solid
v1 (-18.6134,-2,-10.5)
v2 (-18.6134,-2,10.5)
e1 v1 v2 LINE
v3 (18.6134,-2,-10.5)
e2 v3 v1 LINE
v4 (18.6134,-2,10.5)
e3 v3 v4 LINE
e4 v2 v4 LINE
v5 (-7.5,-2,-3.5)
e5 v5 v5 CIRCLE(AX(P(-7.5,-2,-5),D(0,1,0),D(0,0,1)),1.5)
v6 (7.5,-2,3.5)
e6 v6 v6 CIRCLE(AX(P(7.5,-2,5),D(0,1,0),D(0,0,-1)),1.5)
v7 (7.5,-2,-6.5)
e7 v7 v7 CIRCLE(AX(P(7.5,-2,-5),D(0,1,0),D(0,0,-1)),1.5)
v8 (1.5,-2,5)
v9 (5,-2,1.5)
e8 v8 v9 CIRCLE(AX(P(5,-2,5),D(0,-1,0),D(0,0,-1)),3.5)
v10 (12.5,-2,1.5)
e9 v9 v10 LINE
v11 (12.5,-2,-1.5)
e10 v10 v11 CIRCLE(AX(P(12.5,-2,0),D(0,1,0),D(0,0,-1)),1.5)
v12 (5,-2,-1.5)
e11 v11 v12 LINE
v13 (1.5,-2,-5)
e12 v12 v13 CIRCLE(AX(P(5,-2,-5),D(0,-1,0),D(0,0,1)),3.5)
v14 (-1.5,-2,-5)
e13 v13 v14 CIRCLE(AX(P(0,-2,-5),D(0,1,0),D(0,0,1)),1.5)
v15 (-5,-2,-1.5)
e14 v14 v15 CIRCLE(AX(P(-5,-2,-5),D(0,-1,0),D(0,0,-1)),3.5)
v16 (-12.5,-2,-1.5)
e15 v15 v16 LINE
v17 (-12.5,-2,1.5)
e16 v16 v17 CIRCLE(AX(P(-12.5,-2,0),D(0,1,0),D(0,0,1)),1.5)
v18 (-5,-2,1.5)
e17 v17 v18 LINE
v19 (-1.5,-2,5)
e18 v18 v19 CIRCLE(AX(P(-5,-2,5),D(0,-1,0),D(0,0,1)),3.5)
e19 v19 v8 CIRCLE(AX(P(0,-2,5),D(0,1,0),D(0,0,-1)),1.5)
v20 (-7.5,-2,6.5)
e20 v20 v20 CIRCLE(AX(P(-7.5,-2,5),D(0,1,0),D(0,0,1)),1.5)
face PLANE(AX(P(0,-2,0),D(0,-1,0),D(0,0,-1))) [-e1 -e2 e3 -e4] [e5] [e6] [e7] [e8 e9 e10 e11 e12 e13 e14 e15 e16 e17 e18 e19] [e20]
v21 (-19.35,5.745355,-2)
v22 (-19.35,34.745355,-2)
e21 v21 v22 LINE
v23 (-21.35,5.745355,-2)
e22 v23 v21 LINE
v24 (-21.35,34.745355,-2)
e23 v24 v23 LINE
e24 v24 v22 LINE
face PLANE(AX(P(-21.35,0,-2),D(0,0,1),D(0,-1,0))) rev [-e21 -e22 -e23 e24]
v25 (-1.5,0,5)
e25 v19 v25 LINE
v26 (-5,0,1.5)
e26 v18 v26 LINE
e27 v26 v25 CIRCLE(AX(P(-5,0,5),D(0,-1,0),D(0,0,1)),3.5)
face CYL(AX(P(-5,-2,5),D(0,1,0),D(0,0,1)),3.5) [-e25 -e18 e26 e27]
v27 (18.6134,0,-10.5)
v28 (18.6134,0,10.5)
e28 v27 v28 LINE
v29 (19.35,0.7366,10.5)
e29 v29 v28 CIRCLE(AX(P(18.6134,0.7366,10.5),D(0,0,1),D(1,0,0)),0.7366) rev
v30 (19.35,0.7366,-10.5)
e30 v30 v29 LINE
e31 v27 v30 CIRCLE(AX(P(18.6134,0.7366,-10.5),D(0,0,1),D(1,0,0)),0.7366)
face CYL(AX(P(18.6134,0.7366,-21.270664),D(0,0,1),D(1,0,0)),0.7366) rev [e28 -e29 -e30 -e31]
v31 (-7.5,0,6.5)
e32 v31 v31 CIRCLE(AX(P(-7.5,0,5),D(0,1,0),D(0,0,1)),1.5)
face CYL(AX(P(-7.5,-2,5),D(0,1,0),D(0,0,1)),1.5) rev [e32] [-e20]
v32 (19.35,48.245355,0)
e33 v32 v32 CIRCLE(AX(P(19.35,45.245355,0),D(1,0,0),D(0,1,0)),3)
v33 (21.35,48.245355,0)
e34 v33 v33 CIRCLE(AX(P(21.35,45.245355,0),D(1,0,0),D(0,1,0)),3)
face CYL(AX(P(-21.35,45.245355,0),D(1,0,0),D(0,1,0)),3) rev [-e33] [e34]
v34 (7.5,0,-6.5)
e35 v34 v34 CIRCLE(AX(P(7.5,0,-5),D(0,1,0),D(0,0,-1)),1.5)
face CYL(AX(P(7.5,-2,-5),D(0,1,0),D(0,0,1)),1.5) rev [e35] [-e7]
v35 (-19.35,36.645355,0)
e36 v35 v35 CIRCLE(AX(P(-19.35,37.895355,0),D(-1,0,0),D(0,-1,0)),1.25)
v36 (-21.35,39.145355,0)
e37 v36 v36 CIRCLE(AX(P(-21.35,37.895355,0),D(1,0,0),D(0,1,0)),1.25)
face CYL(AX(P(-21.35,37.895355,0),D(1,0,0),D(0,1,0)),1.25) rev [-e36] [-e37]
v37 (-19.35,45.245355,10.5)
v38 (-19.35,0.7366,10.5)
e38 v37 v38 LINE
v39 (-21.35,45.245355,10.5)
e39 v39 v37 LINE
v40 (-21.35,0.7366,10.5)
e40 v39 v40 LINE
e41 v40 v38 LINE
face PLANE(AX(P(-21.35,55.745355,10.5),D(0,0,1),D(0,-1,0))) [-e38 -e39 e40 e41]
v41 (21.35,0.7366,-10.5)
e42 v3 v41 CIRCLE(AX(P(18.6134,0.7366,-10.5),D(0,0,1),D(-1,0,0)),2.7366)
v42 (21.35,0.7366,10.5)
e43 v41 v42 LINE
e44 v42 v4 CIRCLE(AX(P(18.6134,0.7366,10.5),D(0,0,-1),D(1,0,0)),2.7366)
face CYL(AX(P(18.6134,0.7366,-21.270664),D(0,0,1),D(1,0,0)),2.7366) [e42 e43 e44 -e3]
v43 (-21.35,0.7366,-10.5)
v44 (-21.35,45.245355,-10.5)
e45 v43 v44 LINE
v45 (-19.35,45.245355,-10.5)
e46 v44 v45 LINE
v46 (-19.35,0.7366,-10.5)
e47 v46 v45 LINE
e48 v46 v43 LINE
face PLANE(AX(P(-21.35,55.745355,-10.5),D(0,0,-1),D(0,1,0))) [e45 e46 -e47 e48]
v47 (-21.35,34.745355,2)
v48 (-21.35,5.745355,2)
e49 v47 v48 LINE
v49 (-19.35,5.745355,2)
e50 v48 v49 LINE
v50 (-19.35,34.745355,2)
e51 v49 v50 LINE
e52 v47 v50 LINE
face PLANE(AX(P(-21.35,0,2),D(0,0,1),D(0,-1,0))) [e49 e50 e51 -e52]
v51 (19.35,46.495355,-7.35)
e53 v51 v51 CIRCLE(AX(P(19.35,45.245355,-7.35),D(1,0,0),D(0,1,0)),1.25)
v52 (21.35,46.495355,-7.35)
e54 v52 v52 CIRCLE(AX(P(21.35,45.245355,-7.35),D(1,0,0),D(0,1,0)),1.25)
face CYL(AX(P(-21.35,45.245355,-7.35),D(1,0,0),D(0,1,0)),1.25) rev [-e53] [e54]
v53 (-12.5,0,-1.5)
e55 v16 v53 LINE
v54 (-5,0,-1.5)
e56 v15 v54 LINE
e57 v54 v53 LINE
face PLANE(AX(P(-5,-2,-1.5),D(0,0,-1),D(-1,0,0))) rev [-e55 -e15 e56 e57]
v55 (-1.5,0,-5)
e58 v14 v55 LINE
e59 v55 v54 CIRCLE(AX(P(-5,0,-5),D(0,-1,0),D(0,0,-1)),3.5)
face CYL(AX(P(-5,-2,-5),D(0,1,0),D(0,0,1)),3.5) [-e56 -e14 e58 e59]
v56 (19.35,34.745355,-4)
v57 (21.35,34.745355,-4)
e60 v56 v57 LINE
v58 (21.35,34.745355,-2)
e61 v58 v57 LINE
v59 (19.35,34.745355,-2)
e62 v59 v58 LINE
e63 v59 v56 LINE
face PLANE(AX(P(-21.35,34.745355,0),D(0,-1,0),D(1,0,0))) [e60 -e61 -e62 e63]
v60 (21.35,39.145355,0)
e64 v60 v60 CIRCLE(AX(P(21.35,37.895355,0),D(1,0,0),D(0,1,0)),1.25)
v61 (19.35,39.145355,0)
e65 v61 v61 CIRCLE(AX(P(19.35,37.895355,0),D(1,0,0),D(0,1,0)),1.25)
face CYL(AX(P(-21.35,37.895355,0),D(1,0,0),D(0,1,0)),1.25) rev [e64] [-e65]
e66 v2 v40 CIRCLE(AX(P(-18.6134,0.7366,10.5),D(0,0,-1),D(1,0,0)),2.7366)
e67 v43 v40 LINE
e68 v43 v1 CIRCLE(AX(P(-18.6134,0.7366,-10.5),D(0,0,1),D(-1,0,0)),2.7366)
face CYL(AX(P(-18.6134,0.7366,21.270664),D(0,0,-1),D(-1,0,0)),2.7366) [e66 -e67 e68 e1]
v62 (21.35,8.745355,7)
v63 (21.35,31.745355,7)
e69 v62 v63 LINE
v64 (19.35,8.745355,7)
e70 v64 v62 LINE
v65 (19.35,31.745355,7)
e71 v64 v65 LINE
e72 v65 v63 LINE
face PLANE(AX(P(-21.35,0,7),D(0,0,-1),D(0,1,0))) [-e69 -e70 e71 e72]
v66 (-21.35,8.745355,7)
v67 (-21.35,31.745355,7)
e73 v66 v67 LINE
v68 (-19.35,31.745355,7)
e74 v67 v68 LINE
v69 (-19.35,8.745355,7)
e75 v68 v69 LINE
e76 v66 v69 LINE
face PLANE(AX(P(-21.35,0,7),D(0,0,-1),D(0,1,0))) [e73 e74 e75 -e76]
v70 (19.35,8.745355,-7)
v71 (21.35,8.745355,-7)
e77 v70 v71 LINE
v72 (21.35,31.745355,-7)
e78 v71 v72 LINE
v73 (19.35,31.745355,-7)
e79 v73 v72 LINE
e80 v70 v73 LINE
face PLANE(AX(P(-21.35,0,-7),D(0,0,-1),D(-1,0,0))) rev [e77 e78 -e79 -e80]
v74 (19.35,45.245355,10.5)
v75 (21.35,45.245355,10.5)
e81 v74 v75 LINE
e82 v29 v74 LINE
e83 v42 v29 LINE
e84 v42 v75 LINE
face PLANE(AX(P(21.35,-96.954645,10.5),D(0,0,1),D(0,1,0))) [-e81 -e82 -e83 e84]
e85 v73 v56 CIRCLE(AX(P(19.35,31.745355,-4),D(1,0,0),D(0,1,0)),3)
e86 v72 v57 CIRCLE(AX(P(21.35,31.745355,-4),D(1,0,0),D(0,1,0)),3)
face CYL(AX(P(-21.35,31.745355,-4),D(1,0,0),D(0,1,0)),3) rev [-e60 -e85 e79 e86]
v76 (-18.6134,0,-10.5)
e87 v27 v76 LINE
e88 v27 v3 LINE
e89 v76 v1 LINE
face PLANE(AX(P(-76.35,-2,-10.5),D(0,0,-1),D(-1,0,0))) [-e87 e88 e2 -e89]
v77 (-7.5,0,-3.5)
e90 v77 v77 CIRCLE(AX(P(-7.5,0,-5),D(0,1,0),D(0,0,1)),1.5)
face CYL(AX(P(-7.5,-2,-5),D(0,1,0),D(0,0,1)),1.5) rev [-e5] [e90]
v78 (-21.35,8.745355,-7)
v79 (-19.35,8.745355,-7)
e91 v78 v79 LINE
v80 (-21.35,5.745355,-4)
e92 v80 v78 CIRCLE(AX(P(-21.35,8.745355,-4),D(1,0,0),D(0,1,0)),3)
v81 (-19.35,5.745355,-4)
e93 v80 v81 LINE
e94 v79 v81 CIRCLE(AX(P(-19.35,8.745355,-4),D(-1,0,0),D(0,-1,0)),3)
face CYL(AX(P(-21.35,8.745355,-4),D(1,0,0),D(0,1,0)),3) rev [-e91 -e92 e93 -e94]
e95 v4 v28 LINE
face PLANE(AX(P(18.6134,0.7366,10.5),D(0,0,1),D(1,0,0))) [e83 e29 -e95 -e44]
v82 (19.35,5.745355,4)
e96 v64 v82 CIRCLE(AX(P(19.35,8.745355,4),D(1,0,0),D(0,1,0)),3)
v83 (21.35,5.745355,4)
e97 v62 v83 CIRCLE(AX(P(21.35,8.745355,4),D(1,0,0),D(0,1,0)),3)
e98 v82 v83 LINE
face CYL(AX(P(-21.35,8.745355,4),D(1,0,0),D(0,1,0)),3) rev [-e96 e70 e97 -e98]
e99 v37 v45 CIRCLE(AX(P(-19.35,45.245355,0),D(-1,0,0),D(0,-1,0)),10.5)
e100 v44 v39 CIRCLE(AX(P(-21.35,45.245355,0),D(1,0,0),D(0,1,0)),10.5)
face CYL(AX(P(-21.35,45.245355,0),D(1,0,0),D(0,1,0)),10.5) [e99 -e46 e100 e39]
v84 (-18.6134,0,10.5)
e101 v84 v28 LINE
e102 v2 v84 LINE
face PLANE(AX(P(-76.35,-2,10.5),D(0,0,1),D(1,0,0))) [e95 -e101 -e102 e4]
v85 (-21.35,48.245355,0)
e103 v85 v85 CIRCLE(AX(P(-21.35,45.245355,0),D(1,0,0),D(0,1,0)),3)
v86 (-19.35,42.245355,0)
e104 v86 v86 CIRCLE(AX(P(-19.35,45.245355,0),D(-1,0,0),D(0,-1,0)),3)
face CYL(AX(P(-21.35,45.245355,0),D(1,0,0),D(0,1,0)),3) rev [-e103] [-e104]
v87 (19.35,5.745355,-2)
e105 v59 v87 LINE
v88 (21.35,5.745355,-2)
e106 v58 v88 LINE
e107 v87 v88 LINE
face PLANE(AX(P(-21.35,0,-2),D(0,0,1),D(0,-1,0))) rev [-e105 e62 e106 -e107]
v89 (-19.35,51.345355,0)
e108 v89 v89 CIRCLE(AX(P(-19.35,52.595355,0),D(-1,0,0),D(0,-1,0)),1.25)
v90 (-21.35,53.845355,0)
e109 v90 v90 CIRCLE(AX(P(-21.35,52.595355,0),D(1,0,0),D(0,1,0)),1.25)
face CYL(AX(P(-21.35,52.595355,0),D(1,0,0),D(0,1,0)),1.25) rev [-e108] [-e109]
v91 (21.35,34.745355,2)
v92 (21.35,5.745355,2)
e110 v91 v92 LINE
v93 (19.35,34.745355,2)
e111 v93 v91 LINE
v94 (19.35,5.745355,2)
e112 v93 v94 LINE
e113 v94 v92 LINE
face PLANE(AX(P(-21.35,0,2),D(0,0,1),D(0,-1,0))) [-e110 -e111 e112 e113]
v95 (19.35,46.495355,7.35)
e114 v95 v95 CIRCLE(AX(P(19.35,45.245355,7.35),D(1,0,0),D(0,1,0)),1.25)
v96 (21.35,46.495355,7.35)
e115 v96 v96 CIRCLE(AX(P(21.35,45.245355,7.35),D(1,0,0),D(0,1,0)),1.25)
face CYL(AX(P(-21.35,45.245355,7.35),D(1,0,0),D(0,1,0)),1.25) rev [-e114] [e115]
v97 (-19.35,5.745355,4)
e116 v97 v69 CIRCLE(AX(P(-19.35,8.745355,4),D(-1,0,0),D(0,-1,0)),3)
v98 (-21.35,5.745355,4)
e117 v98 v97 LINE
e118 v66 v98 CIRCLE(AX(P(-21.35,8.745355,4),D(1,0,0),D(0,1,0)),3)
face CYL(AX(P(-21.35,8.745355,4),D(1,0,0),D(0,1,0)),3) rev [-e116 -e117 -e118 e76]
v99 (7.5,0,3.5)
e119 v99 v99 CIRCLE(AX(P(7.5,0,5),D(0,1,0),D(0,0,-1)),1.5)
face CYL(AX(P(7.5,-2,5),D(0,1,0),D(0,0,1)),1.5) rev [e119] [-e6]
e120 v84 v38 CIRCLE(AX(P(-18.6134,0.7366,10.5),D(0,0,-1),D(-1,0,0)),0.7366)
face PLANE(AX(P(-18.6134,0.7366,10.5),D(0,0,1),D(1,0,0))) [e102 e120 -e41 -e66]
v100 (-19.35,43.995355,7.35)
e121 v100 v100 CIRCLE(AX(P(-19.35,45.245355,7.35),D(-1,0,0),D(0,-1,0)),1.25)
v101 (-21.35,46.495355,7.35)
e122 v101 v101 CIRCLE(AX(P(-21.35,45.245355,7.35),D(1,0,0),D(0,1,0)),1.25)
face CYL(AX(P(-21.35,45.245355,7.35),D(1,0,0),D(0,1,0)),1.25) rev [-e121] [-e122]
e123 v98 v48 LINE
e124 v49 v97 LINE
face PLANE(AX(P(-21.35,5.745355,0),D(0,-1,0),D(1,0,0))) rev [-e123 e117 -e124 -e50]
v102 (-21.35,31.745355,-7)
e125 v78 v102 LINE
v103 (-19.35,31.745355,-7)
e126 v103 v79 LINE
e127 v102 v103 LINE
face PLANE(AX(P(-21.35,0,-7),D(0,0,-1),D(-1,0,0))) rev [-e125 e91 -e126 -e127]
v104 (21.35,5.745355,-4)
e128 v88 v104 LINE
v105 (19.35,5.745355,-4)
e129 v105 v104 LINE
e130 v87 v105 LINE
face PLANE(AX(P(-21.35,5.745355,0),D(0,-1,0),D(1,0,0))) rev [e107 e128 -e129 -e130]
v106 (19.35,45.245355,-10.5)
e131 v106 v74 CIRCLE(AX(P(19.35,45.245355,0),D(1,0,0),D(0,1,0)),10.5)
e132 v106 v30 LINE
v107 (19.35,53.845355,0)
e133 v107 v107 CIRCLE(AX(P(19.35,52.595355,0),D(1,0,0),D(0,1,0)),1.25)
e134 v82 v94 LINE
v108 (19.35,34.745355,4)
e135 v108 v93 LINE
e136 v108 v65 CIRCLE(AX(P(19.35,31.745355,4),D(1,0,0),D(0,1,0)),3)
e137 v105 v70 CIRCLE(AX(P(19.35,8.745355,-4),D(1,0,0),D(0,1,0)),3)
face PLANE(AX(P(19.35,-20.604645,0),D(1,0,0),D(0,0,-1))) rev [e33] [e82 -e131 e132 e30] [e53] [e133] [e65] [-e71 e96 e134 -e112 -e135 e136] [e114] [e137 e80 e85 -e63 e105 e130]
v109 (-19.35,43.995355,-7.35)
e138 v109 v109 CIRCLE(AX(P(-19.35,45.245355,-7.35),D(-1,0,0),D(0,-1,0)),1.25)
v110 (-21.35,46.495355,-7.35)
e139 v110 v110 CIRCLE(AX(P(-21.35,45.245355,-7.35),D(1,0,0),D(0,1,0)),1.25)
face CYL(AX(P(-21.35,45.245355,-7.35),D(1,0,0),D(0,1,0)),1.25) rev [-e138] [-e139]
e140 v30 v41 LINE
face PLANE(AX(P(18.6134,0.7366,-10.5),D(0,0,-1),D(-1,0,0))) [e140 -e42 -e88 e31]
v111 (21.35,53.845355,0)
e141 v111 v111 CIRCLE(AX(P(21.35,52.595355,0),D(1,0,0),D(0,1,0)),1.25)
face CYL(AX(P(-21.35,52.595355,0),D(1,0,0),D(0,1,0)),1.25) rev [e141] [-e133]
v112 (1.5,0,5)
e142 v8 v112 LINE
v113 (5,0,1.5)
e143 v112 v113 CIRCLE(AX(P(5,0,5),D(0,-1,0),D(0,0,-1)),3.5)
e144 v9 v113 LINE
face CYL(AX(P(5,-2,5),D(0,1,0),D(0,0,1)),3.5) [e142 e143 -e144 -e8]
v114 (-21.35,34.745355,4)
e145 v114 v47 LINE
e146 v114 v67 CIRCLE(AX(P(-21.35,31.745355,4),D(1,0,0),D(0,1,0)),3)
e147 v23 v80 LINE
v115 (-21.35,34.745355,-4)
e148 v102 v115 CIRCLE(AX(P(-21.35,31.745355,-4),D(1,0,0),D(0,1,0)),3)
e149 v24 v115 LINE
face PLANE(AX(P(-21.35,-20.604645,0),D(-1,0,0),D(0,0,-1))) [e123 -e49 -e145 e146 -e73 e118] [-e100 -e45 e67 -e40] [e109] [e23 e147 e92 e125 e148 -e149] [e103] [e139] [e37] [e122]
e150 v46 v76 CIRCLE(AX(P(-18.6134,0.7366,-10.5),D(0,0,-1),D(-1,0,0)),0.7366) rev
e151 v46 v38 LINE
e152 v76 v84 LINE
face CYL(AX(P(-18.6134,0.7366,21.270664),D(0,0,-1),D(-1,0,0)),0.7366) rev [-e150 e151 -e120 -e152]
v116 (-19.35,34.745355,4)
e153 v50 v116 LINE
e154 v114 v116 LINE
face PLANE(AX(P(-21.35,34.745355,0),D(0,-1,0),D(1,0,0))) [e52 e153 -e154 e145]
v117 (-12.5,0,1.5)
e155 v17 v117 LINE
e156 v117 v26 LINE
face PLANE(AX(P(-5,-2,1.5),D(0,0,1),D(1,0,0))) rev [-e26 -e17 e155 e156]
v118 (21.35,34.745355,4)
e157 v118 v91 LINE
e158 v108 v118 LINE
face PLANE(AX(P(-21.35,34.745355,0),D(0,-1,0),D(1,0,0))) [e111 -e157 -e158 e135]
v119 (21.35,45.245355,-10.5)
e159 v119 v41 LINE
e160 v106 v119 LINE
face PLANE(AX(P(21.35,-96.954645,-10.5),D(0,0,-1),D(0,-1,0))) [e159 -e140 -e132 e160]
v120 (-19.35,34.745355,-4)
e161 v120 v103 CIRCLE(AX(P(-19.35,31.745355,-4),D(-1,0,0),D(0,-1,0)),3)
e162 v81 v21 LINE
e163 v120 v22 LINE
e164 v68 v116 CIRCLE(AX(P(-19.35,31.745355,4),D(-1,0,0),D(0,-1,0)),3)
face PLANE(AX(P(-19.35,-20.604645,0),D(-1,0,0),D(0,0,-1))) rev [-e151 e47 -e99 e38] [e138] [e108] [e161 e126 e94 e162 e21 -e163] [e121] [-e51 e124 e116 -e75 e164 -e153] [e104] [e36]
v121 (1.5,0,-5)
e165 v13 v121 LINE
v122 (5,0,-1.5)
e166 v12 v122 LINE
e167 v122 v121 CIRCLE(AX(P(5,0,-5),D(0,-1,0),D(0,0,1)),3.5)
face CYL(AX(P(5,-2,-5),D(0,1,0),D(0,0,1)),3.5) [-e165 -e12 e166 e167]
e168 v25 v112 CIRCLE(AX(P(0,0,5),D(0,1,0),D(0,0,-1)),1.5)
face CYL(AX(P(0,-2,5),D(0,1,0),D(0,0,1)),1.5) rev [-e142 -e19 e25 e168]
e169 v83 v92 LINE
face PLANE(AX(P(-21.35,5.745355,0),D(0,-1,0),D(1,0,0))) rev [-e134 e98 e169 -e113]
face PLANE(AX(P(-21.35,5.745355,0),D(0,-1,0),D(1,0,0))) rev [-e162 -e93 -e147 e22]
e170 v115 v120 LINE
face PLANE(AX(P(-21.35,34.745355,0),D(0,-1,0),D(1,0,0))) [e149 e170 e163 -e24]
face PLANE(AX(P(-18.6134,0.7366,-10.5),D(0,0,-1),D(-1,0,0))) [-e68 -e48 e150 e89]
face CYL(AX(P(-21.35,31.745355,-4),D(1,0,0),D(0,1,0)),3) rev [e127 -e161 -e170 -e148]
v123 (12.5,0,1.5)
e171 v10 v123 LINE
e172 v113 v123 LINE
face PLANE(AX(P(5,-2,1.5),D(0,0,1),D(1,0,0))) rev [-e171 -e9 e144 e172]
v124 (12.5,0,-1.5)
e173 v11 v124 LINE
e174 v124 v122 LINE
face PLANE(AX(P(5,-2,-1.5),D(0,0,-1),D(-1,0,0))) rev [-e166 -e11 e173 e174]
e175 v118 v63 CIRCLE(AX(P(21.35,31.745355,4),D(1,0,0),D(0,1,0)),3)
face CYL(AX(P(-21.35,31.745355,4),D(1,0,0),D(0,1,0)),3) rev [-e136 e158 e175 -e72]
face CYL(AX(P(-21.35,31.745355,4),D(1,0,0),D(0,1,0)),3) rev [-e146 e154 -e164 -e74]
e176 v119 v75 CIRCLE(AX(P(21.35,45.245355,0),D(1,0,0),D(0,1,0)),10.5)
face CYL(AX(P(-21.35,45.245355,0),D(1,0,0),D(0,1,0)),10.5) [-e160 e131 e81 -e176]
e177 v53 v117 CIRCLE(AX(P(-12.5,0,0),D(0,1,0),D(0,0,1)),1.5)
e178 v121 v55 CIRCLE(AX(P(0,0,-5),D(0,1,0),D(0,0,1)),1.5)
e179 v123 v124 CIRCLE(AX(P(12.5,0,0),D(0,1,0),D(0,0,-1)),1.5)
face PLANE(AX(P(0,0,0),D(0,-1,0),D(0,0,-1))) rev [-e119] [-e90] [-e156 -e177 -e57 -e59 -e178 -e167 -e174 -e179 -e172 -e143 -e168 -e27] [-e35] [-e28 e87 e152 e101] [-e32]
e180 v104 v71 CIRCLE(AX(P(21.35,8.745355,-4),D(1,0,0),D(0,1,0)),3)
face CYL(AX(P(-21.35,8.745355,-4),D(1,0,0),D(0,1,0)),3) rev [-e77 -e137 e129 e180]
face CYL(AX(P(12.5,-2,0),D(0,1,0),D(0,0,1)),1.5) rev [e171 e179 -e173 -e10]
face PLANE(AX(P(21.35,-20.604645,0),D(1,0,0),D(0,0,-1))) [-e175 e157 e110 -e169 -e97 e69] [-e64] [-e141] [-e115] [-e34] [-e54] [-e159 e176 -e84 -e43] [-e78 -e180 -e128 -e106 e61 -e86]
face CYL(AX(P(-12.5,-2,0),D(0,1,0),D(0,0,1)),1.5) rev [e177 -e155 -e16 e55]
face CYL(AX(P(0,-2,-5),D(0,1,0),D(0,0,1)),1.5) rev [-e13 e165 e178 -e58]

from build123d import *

# Parameters (mm, degrees)
CROQUIS2_W                  = 152.7
CROQUIS2_H                  = 21
BRIDA_BASE1_DEPTH           = 2
PLIEGUE_START               = -10.5
PLIEGUE_CROQUIZADO1_DEPTH   = 21
PLIEGUE_CROQUIZADO1_2_DEPTH = 21
CROQUIS8_R                  = 1.25
CROQUIS8_R_2                = 3
CORTAR_EXTRUIR1_DEPTH       = 72.000595879
CROQUIS9_R                  = 1.5
CORTAR_EXTRUIR2_DEPTH       = 2


# Read off the part's stored shape, not the designer's step: Pliegue croquizado1
# Sheet-metal steps are written as plain solids
with BuildPart() as part:
    # Croquis2 → Brida base1 (new body)
    with BuildSketch(Plane(origin=(0, 0, 0), x_dir=(1, 0, 0), z_dir=(0, 1, 0))):
        Rectangle(CROQUIS2_W, CROQUIS2_H)
    extrude(amount=-BRIDA_BASE1_DEPTH)

    # Pliegue croquizado1 outline → Pliegue croquizado1 (cut)
    with BuildSketch(Plane.XY.offset(PLIEGUE_START)):
        with BuildLine():
            Line((-76.35, -2), (-18.6134, -2))
            ThreePointArc((-18.6134, -2), (-20.267667209, -1.443395312), (-21.249002398, 0))
            Line((-21.249002398, 0), (-76.35, 0))
            Line((-76.35, 0), (-76.35, -2))
        make_face()
        with BuildLine():
            ThreePointArc((21.249002398, 0), (20.267667209, -1.443395312), (18.6134, -2))
            Line((18.6134, -2), (76.35, -2))
            Line((76.35, -2), (76.35, 0))
            Line((76.35, 0), (21.249002398, 0))
        make_face()
    extrude(amount=PLIEGUE_CROQUIZADO1_DEPTH, mode=Mode.SUBTRACT)

    # Pliegue croquizado1 2 outline → Pliegue croquizado1 2 (add)
    with BuildSketch(Plane.XY.offset(PLIEGUE_START)):
        with BuildLine():
            ThreePointArc((-21.35, 0.7366), (-21.324633029, 0.364854094), (-21.249002398, 0))
            Line((-21.249002398, 0), (-18.6134, 0))
            ThreePointArc((-18.6134, 0), (-19.134254855, 0.215745145), (-19.35, 0.7366))
            Line((-19.35, 0.7366), (-19.35, 55.745355099))
            Line((-19.35, 55.745355099), (-21.35, 55.745355099))
            Line((-21.35, 55.745355099), (-21.35, 0.7366))
        make_face()
        with BuildLine():
            Line((18.6134, 0), (21.249002398, 0))
            ThreePointArc((21.249002398, 0), (21.324633029, 0.364854094), (21.35, 0.7366))
            Line((21.35, 0.7366), (21.35, 55.745355099))
            Line((21.35, 55.745355099), (19.35, 55.745355099))
            Line((19.35, 55.745355099), (19.35, 0.7366))
            ThreePointArc((19.35, 0.7366), (19.134254855, 0.215745145), (18.6134, 0))
        make_face()
    extrude(amount=PLIEGUE_CROQUIZADO1_2_DEPTH)

    # Croquis8 → Cortar-Extruir1 (cut, through all)
    with BuildSketch(Plane(origin=(21.35, 0, 0), x_dir=(0, 0, -1), z_dir=(1, 0, 0))):
        with BuildLine():
            Line((-7, 8.745355099), (-7, 31.745355099))
            ThreePointArc((-7, 31.745355099), (-6.121320344, 33.866675442), (-4, 34.745355099))
            Line((-4, 34.745355099), (-2, 34.745355099))
            Line((-2, 34.745355099), (-2, 5.745355099))
            Line((-2, 5.745355099), (-4, 5.745355099))
            ThreePointArc((-4, 5.745355099), (-6.121320344, 6.624034755), (-7, 8.745355099))
        make_face()
        with BuildLine():
            Line((2, 5.745355099), (4, 5.745355099))
            ThreePointArc((4, 5.745355099), (6.121320344, 6.624034755), (7, 8.745355099))
            Line((7, 8.745355099), (7, 31.745355099))
            ThreePointArc((7, 31.745355099), (6.121320344, 33.866675442), (4, 34.745355099))
            Line((4, 34.745355099), (2, 34.745355099))
            Line((2, 34.745355099), (2, 5.745355099))
        make_face()
        with BuildLine():
            ThreePointArc((0, 55.745355099), (7.424621202, 52.669976301), (10.5, 45.245355099))
            Line((10.5, 45.245355099), (10.5, 55.745355099))
            Line((10.5, 55.745355099), (0, 55.745355099))
        make_face()
        with BuildLine():
            ThreePointArc((-10.5, 45.245355099), (-7.424621202, 52.669976301), (0, 55.745355099))
            Line((0, 55.745355099), (-10.5, 55.745355099))
            Line((-10.5, 55.745355099), (-10.5, 45.245355099))
        make_face()
        with Locations(Location((-7.35, 45.245355099, 0), (0, 0, 90))):
            Circle(CROQUIS8_R)
        with Locations(Location((0, 37.895355099, 0), (0, 0, 90))):
            Circle(CROQUIS8_R)
        with Locations(Location((7.35, 45.245355099, 0), (0, 0, 90))):
            Circle(CROQUIS8_R)
        with Locations(Location((0, 52.595355099, 0), (0, 0, 90))):
            Circle(CROQUIS8_R)
        with Locations(Location((0, 45.245355099, 0), (0, 0, 90))):
            Circle(CROQUIS8_R_2)
    extrude(amount=-CORTAR_EXTRUIR1_DEPTH, mode=Mode.SUBTRACT)

    # Croquis9 → Cortar-Extruir2 (cut)
    with BuildSketch(Plane(origin=(0, 0, 0), x_dir=(1, 0, 0), z_dir=(0, 1, 0))):
        with Locations(Location((-7.5, 5, 0), (0, 0, 270))):
            Circle(CROQUIS9_R)
        with Locations(Location((-7.5, -5, 0), (0, 0, 270))):
            Circle(CROQUIS9_R)
        with Locations(Location((7.5, -5, 0), (0, 0, 90))):
            Circle(CROQUIS9_R)
        with Locations(Location((7.5, 5, 0), (0, 0, 90))):
            Circle(CROQUIS9_R)
        with BuildLine():
            Line((-5, 1.5), (-12.5, 1.5))
            ThreePointArc((-12.5, 1.5), (-14, 0), (-12.5, -1.5))
            Line((-12.5, -1.5), (-5, -1.5))
            ThreePointArc((-5, -1.5), (-2.525126266, -2.525126266), (-1.5, -5))
            ThreePointArc((-1.5, -5), (0, -6.5), (1.5, -5))
            ThreePointArc((1.5, -5), (2.525126266, -2.525126266), (5, -1.5))
            Line((5, -1.5), (12.5, -1.5))
            ThreePointArc((12.5, -1.5), (14, 0), (12.5, 1.5))
            Line((12.5, 1.5), (5, 1.5))
            ThreePointArc((5, 1.5), (2.525126266, 2.525126266), (1.5, 5))
            ThreePointArc((1.5, 5), (0, 6.5), (-1.5, 5))
            ThreePointArc((-1.5, 5), (-2.525126266, 2.525126266), (-5, 1.5))
        make_face()
    extrude(amount=-CORTAR_EXTRUIR2_DEPTH, mode=Mode.SUBTRACT)


solid = part.part
